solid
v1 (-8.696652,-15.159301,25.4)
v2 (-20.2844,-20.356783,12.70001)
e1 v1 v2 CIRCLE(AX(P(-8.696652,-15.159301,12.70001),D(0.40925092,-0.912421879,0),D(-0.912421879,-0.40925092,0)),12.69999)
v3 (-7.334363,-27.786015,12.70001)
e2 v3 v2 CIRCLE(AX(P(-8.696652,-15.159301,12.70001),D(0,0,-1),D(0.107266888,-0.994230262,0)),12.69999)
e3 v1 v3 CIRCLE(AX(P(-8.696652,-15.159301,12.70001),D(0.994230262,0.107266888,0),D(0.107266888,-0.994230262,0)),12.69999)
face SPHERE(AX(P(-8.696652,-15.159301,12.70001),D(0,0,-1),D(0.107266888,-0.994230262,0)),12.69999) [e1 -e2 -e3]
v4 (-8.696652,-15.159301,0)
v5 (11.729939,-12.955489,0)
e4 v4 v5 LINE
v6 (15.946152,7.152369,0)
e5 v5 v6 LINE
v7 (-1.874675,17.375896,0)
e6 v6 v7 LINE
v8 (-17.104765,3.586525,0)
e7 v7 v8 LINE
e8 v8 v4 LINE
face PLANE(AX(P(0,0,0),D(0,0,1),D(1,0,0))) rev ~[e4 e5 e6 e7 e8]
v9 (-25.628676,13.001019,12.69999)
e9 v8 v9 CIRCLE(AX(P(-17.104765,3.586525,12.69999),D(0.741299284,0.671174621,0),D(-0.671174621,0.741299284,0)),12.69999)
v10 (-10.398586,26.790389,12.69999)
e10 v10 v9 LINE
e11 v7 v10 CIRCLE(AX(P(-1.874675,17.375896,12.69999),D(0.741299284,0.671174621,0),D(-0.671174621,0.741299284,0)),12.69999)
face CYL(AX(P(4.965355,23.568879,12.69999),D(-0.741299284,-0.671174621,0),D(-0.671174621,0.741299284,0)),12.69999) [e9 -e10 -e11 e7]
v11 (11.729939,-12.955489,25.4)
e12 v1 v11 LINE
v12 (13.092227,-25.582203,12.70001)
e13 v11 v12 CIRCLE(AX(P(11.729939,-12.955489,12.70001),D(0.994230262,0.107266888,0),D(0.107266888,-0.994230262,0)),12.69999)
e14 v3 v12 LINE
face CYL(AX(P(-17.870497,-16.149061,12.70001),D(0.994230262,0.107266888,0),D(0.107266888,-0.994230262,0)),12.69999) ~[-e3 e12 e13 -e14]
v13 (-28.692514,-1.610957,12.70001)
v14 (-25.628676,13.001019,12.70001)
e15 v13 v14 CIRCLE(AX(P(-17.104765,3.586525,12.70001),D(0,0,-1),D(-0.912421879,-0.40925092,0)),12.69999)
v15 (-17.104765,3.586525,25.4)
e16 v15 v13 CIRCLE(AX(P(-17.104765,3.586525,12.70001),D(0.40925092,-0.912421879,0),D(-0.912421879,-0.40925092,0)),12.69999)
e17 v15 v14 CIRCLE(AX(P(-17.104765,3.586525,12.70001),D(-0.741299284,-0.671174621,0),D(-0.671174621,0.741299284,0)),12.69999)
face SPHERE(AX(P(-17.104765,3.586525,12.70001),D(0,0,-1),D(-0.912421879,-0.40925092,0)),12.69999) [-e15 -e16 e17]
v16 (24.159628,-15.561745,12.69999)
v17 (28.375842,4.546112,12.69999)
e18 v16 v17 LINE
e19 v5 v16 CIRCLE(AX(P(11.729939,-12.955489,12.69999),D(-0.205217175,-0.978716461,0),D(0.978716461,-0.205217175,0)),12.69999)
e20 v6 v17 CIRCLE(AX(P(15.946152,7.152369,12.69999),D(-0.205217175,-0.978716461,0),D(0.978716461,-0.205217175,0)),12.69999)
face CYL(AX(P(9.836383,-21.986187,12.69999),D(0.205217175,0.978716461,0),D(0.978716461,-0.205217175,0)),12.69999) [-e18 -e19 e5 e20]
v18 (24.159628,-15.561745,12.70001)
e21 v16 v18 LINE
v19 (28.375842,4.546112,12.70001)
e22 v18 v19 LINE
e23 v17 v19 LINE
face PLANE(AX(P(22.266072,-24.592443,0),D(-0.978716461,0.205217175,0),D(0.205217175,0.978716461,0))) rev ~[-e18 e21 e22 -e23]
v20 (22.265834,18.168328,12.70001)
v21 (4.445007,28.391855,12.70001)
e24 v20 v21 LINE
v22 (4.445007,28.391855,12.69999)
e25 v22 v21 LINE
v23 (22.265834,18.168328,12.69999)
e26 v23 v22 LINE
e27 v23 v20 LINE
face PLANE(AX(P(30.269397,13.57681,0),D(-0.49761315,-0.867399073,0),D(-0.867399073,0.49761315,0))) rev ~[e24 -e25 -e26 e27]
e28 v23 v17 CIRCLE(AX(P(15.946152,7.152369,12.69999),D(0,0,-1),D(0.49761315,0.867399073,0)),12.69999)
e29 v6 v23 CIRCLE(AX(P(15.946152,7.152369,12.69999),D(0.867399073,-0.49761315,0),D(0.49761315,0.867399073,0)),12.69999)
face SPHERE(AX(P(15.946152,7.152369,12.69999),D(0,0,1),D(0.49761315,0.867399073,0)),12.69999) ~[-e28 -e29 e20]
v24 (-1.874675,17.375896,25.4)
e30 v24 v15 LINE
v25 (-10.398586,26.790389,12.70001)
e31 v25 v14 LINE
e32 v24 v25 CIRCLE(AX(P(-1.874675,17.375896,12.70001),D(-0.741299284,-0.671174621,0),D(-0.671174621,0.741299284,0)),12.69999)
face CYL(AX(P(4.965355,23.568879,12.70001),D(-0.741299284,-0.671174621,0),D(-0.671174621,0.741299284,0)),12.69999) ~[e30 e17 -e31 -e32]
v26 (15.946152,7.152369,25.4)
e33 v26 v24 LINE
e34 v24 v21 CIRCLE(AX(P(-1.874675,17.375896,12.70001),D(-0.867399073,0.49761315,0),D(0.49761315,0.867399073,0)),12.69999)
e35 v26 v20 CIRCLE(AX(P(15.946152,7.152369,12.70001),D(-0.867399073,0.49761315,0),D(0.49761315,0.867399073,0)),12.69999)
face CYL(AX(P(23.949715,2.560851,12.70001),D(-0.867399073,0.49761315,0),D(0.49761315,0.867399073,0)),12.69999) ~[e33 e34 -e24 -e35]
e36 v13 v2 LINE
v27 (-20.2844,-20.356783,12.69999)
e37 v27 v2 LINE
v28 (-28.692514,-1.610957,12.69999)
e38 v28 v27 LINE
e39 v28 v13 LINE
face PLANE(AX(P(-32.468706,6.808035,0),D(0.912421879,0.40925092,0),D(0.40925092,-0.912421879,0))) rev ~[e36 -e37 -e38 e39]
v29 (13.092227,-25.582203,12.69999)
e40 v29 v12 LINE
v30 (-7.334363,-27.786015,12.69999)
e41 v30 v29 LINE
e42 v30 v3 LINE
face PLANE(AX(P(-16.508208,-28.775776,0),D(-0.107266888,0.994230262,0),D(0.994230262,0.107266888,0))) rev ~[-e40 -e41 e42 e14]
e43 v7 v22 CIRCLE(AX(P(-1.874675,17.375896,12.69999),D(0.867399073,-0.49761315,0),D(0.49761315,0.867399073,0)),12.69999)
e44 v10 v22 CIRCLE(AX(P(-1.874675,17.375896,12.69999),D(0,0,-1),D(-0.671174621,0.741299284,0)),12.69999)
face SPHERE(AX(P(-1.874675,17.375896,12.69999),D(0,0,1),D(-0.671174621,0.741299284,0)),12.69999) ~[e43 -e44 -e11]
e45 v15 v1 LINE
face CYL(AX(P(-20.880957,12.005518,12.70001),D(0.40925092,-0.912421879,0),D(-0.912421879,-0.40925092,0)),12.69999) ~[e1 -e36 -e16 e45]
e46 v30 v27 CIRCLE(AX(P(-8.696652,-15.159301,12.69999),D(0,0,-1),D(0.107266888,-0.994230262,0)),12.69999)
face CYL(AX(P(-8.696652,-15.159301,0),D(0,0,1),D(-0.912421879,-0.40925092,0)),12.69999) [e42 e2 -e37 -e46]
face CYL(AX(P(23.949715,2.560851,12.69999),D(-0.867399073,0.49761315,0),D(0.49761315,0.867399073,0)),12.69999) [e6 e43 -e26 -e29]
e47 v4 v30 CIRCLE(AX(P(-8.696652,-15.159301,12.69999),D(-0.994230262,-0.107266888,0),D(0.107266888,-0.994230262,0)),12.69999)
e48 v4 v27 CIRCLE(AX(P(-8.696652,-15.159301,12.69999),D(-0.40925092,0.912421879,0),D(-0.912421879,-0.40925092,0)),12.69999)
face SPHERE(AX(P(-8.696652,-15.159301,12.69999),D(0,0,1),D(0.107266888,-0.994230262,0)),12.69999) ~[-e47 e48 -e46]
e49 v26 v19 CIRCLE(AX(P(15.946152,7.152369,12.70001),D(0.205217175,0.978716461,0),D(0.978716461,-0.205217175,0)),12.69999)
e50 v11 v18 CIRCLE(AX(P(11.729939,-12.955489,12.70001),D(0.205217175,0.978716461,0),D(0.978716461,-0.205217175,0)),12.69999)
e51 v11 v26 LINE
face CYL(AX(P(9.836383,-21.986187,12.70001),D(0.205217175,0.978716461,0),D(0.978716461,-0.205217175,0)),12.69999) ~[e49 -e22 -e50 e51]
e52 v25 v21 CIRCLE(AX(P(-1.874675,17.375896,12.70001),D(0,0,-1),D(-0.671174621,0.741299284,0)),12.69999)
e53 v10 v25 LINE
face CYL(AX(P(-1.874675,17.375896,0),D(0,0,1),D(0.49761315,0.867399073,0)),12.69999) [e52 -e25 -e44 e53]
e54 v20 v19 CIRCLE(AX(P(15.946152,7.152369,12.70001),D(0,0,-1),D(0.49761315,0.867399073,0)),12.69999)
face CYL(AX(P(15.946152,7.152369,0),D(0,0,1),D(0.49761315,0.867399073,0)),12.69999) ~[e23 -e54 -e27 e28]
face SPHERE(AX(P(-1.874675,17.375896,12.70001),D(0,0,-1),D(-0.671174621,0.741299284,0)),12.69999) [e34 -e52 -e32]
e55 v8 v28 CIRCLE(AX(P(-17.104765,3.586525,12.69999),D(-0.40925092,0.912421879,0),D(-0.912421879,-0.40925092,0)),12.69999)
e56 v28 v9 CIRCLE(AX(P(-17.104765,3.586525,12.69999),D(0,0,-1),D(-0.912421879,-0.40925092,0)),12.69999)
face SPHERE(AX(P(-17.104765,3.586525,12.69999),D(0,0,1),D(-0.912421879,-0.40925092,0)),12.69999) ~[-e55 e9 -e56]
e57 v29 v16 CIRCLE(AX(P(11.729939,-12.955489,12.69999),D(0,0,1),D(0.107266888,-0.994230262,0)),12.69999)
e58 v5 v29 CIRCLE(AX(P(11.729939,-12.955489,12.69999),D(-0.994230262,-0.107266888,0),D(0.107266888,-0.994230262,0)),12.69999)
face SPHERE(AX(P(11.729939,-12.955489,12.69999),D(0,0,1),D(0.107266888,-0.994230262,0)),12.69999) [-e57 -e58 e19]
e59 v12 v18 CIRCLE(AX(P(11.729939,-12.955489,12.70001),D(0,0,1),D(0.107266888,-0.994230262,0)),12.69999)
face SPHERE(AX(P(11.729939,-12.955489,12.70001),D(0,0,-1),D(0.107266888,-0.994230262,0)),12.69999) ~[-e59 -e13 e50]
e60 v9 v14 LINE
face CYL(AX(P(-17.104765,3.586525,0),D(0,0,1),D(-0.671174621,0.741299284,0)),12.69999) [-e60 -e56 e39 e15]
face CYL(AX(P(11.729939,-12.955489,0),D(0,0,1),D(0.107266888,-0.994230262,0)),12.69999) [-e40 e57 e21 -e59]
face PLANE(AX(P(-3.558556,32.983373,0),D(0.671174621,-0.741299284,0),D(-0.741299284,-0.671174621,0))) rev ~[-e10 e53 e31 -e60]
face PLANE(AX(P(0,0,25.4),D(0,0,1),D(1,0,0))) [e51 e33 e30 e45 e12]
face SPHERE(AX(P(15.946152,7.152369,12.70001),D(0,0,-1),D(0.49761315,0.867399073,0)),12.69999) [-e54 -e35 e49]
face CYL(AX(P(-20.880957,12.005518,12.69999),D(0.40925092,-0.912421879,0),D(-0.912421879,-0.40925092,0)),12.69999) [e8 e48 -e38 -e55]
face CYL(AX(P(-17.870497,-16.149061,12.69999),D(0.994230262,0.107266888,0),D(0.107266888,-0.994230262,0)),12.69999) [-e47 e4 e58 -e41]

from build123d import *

# Parameters (mm, degrees)
F1_DEPTH = 25.4
F2_R     = 12.69999


# Not quite as in the source:
# - a fillet or chamfer is up to 0.001 mm smaller than in the source, because OpenCascade refuses the exact size


with BuildPart() as f1:
    # F0 (on Top) → F1 (new body)
    with BuildSketch(Plane.XY):
        Polygon((30.2693974938, 13.5768103187), (-3.5585556891, 32.9833728487), (-32.4687058605, 6.8080351654), (-16.5082081035, -28.7757757199), (22.2660721592, -24.5924426129), align=None)
    extrude(amount=F1_DEPTH)

    # F2 (radius 12.7 in the source; OpenCascade refuses exactly that, so slightly less here)
    f2_edges = [f1.edges().sort_by_distance(p)[0] for p in [
        (-16.508208, -28.775776, 12.7),
        (22.266072, -24.592443, 12.7),
        (2.878932, -26.684109, 0),
        (2.878932, -26.684109, 25.4),
        (-32.468706, 6.808035, 12.7),
        (-24.488457, -10.98387, 0),
        (-24.488457, -10.98387, 25.4),
        (-3.558556, 32.983373, 12.7),
        (-18.013631, 19.895704, 0),
        (-18.013631, 19.895704, 25.4),
        (30.269397, 13.57681, 12.7),
        (13.355421, 23.280092, 0),
        (13.355421, 23.280092, 25.4),
        (26.267735, -5.507816, 0),
        (26.267735, -5.507816, 25.4),
    ]]
    fillet(f2_edges, radius=F2_R)


solid = f1.part
